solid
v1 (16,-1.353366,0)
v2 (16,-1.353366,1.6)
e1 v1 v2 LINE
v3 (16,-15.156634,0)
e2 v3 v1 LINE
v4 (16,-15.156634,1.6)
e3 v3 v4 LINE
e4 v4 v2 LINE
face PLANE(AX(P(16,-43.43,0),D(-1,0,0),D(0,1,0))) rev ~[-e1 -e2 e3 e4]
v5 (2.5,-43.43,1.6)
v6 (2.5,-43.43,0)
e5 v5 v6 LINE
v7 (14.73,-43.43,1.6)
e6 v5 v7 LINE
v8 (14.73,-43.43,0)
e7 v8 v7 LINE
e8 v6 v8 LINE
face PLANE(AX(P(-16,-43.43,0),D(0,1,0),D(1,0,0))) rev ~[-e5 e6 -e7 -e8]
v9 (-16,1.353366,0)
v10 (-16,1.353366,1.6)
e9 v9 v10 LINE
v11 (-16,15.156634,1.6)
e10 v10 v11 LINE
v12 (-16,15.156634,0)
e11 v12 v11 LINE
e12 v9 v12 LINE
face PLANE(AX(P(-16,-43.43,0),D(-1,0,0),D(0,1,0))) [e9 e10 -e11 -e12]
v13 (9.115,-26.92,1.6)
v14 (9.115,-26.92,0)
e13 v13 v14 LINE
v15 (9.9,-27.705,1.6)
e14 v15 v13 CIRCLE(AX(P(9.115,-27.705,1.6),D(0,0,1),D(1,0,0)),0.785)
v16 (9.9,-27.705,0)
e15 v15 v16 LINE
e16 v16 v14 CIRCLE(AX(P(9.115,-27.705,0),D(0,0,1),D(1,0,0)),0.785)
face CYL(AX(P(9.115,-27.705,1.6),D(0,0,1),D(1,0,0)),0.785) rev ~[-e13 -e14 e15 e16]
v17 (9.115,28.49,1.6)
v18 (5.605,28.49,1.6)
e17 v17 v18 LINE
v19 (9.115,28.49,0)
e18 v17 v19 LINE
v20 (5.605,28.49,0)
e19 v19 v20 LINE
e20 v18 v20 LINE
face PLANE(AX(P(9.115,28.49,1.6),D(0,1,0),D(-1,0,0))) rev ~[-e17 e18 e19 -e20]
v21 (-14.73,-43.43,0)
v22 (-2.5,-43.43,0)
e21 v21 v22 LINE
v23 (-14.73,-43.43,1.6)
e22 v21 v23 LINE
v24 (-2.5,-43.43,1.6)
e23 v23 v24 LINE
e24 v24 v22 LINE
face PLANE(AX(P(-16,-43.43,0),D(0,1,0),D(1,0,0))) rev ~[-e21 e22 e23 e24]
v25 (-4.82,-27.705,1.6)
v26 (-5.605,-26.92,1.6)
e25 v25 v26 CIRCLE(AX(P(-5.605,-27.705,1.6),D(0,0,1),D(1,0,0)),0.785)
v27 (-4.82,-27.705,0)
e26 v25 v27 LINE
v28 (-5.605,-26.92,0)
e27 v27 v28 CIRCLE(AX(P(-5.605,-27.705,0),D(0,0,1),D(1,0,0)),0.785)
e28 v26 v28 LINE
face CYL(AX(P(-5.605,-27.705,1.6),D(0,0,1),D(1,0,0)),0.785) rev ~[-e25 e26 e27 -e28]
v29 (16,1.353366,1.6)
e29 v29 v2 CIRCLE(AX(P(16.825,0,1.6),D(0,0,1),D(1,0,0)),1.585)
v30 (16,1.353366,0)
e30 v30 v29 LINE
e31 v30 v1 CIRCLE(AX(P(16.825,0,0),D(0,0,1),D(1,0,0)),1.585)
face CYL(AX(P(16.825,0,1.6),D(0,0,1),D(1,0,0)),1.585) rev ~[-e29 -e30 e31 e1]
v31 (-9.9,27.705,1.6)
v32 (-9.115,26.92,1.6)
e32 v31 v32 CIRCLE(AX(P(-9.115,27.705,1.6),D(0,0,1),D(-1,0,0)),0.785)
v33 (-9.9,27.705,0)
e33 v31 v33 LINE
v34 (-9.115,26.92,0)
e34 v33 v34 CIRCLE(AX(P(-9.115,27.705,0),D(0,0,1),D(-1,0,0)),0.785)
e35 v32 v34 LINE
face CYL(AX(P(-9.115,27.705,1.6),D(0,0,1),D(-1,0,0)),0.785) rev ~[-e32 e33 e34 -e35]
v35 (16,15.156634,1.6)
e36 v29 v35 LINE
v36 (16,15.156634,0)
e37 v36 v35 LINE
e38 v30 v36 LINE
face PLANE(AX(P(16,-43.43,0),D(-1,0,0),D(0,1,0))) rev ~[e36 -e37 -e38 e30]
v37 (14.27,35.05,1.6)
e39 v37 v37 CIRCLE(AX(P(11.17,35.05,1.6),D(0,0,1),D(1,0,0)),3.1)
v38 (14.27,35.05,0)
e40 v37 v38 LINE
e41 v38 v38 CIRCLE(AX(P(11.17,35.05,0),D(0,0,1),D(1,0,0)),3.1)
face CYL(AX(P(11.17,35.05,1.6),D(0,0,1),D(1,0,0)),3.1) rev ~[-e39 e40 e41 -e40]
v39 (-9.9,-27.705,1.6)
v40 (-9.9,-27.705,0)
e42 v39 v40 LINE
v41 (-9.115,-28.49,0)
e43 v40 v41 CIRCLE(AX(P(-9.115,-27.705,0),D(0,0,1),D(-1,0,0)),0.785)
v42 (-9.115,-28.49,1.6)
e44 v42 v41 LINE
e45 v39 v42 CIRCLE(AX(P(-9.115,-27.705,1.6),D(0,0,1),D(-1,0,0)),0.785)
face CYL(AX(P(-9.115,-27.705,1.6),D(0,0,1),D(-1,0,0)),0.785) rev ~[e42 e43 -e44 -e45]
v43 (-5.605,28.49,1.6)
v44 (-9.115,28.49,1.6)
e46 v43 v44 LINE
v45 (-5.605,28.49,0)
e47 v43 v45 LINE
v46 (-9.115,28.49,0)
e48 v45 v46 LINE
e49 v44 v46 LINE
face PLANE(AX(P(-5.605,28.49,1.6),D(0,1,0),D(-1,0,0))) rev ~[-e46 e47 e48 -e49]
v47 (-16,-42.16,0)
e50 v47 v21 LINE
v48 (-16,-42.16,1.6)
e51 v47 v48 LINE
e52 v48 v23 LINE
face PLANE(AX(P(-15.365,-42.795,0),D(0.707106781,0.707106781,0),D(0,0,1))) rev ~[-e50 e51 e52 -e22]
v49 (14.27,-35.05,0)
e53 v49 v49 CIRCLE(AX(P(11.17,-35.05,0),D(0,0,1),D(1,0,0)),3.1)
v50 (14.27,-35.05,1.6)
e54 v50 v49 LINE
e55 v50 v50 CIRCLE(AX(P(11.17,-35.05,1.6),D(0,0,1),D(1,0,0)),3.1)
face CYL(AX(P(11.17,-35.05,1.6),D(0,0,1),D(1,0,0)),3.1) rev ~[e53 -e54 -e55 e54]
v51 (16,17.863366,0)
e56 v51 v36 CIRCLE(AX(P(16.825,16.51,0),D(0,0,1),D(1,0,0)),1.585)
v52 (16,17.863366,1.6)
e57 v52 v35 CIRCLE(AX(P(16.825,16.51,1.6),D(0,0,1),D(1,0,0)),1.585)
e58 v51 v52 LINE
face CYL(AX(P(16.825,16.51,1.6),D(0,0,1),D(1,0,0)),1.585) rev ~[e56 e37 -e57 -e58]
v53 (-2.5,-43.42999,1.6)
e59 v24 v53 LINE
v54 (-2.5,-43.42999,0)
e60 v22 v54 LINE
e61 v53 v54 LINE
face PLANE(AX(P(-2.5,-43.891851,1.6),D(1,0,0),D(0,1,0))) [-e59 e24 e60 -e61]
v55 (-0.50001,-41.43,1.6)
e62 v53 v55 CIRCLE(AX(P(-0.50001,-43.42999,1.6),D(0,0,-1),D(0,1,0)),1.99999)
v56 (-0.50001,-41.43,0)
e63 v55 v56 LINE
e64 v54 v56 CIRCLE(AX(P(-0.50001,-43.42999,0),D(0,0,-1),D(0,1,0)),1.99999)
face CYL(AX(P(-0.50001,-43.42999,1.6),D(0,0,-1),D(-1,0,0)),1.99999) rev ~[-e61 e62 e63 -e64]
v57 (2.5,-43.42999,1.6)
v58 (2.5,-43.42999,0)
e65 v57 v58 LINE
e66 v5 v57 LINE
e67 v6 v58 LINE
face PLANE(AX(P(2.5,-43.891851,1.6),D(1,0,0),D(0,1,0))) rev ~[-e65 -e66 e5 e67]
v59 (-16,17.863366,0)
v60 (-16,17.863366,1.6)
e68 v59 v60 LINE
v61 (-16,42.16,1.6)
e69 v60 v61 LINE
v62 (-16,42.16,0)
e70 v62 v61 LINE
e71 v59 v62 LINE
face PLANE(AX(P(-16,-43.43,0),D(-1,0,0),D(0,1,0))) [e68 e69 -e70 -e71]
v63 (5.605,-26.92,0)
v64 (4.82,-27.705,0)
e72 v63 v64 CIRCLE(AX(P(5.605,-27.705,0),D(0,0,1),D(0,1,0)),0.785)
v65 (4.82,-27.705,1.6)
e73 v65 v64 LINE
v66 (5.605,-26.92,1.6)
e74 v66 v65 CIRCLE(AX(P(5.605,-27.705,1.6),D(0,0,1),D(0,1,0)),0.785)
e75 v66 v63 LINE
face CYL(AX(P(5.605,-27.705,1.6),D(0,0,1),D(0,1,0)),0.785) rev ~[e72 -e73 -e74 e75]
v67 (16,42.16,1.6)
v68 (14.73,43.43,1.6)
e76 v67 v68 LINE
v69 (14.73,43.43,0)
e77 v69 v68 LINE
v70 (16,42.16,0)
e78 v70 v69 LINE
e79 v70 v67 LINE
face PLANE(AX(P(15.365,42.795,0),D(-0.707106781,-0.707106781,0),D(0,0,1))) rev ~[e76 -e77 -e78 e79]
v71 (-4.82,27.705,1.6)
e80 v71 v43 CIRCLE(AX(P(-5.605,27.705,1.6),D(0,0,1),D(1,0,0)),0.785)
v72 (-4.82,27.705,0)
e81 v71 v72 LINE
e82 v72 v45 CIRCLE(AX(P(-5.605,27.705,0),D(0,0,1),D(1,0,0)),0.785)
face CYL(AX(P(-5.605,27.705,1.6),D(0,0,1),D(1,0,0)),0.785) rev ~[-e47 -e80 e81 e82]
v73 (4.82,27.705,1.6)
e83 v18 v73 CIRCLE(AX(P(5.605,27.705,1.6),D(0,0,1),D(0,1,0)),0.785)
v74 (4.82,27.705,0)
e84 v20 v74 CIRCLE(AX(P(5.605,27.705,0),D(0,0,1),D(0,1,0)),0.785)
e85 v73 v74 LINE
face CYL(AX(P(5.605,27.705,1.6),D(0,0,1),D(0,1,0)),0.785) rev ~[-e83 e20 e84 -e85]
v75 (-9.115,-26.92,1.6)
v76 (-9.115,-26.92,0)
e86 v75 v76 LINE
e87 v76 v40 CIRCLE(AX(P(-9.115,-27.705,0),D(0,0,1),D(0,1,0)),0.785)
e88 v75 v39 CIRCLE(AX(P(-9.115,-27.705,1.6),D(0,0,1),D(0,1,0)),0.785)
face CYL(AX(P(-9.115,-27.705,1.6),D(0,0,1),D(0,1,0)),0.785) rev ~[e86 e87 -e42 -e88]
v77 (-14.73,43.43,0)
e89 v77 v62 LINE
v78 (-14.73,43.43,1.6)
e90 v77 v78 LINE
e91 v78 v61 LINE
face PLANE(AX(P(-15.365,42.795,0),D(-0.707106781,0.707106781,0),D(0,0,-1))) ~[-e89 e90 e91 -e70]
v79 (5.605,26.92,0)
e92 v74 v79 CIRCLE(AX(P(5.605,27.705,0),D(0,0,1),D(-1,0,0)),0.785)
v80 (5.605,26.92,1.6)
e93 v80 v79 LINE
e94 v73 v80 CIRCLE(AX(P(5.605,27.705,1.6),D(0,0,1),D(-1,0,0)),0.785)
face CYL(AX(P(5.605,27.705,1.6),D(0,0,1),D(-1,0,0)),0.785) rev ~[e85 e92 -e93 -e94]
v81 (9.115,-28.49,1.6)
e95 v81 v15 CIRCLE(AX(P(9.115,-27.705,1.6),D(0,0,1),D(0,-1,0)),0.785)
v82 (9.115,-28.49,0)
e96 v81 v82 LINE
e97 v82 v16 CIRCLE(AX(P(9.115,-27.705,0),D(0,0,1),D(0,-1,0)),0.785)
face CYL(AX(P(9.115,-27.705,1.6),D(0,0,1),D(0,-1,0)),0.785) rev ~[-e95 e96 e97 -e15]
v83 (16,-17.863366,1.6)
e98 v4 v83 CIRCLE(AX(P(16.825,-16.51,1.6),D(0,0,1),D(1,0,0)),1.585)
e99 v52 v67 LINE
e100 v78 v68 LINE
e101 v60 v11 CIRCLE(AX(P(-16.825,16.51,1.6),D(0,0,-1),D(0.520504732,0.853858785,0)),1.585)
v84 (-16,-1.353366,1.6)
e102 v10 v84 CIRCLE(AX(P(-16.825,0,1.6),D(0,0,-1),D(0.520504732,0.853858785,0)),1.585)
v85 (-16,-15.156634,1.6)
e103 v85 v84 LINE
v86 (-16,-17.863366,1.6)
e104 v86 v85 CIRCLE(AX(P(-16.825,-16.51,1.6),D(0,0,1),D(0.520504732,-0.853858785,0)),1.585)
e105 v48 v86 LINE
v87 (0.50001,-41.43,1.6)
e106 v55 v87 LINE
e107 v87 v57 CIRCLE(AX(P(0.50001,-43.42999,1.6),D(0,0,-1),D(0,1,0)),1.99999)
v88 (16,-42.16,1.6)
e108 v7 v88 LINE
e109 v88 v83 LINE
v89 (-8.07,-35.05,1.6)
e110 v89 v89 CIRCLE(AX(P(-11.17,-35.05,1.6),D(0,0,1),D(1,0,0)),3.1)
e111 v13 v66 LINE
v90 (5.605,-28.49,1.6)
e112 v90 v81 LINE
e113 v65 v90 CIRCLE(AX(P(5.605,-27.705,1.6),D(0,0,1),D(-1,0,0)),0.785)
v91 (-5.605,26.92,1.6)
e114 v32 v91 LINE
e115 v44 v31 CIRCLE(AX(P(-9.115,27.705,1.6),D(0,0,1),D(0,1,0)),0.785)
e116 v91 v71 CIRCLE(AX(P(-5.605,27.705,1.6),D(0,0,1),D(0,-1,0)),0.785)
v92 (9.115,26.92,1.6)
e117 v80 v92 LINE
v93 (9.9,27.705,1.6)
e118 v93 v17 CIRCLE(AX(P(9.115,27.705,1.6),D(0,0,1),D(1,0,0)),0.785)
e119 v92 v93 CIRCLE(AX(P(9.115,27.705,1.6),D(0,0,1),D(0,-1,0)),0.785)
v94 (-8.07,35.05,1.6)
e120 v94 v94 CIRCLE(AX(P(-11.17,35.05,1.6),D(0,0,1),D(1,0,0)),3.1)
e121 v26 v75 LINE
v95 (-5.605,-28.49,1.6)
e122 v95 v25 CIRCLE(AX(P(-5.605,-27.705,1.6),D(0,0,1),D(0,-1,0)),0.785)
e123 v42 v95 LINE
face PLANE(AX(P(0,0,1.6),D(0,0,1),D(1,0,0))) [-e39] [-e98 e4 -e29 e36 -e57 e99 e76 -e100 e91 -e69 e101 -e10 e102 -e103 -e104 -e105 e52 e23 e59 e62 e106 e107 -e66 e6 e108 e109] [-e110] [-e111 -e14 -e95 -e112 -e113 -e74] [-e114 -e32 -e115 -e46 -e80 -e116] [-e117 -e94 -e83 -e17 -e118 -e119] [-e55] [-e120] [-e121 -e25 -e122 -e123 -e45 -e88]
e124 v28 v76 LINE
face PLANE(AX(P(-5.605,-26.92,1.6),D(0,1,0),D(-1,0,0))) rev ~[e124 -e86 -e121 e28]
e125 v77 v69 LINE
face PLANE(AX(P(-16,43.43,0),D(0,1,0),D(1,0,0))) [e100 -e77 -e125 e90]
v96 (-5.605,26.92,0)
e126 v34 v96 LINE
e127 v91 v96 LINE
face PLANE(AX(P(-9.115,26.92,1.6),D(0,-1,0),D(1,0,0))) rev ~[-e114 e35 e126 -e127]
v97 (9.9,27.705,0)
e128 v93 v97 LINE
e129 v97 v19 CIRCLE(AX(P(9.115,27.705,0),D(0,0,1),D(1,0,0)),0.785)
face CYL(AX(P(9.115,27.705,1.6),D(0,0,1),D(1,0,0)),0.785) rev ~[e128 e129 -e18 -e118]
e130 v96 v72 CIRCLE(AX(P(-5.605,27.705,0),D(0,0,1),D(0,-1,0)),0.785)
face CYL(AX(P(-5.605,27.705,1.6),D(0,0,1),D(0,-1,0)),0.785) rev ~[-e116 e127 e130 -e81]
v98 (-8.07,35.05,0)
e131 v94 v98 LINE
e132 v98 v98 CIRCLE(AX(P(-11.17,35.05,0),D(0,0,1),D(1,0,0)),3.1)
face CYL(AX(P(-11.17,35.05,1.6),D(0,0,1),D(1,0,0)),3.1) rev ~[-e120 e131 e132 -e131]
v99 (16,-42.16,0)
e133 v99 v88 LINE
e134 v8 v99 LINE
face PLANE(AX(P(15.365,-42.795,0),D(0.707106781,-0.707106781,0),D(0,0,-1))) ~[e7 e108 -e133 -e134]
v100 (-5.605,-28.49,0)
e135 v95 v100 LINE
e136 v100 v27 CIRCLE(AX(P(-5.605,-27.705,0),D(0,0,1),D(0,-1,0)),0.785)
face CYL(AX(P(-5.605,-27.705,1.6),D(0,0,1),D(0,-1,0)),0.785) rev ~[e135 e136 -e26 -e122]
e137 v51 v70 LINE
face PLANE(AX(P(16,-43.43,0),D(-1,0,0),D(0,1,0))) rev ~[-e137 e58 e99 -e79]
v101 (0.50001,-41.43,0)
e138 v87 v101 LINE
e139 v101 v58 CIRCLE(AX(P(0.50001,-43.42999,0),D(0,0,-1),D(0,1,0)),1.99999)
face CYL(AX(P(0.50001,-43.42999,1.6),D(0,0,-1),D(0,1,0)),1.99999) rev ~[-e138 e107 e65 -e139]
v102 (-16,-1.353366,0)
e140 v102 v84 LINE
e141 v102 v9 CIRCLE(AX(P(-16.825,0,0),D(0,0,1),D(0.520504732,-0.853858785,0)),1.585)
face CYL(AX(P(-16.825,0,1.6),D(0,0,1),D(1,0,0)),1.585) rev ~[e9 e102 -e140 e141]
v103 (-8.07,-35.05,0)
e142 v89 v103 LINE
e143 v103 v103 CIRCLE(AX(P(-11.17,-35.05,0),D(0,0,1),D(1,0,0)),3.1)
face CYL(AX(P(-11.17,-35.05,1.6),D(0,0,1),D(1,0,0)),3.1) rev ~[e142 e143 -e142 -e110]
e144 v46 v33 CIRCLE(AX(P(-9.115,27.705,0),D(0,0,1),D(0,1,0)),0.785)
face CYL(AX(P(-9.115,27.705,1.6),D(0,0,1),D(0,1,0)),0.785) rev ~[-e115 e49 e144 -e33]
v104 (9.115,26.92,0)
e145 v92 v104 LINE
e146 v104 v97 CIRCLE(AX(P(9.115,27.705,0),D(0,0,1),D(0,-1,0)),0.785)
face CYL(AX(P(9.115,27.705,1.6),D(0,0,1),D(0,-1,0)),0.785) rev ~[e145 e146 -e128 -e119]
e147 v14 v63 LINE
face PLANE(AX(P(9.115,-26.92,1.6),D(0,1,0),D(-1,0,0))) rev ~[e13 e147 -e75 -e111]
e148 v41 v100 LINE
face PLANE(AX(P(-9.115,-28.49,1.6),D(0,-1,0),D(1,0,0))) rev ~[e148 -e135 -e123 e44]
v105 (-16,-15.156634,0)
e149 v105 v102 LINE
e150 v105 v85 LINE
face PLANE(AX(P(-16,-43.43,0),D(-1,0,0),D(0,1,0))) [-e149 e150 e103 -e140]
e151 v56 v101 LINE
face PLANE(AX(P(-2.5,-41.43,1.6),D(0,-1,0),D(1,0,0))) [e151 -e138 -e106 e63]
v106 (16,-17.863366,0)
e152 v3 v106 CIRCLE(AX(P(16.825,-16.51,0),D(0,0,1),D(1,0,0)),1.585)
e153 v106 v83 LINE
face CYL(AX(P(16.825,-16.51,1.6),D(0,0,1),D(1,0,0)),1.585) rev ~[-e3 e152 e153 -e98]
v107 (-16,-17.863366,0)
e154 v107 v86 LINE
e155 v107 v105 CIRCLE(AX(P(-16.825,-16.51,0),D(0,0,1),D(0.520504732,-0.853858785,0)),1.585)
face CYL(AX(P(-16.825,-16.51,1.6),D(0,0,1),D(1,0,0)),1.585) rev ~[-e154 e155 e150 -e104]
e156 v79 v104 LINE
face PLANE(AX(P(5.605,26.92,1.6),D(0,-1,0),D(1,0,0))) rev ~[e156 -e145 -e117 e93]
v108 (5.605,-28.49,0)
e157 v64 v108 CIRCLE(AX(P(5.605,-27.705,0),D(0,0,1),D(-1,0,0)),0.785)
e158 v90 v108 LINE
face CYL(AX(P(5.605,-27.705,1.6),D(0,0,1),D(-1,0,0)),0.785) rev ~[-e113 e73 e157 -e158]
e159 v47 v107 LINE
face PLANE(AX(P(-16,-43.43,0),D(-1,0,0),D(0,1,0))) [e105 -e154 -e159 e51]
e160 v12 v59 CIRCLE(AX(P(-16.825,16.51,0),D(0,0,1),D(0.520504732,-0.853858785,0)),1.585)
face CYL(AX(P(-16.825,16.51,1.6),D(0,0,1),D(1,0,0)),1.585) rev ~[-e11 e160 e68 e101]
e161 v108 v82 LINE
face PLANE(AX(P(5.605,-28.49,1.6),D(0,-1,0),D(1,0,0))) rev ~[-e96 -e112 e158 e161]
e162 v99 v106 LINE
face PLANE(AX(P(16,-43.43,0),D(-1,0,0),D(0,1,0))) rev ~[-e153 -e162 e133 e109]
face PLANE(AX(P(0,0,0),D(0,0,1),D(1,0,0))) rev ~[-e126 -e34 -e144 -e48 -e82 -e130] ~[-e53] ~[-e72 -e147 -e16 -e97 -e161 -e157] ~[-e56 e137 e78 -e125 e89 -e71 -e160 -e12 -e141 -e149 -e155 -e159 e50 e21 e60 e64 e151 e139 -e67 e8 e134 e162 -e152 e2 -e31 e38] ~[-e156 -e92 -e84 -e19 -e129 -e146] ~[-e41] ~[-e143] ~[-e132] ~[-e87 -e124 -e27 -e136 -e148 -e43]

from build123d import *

# Parameters (mm, degrees)
F0_W     = 32
F0_H     = 86.86
F1_DEPTH = 1.6
F2_R     = 3.1
F2_R_2   = 1.585
F2_W     = 5
F2_H     = 2.4618506432
F3_DEPTH = 25
F4_SIZE  = 1.27
F5_R     = 1.99999


# Not quite as in the source:
# - a fillet or chamfer is up to 0.001 mm smaller than in the source, because OpenCascade refuses the exact size


with BuildPart() as f1:
    # F0 (on Top) → F1 (new body)
    with BuildSketch(Plane.XY):
        Rectangle(F0_W, F0_H)
    extrude(amount=F1_DEPTH)

    # F2 (on face) → F3 (cut)
    with BuildSketch(Plane.XY.offset(1.6)):
        with Locations((-11.17, 35.05)):
            Circle(F2_R)
        with Locations((11.17, 35.05)):
            Circle(F2_R)
        with Locations((-11.17, -35.05)):
            Circle(F2_R)
        with Locations((11.17, -35.05)):
            Circle(F2_R)
        with BuildLine():
            Line((9.115, 28.49), (5.605, 28.49))
            ThreePointArc((5.605, 28.49), (5.0499211768, 28.2600788232), (4.82, 27.705))
            ThreePointArc((4.82, 27.705), (5.0499211768, 27.1499211768), (5.605, 26.92))
            Line((5.605, 26.92), (9.115, 26.92))
            ThreePointArc((9.115, 26.92), (9.6700788232, 27.1499211768), (9.9, 27.705))
            ThreePointArc((9.9, 27.705), (9.6700788232, 28.2600788232), (9.115, 28.49))
        make_face()
        with BuildLine():
            Line((-5.605, 28.49), (-9.115, 28.49))
            ThreePointArc((-9.115, 28.49), (-9.6700788232, 28.2600788232), (-9.9, 27.705))
            ThreePointArc((-9.9, 27.705), (-9.6700788232, 27.1499211768), (-9.115, 26.92))
            Line((-9.115, 26.92), (-5.605, 26.92))
            ThreePointArc((-5.605, 26.92), (-5.0499211768, 27.1499211768), (-4.82, 27.705))
            ThreePointArc((-4.82, 27.705), (-5.0499211768, 28.2600788232), (-5.605, 28.49))
        make_face()
        with Locations((16.825, 16.51)):
            Circle(F2_R_2)
        with Locations((16.825, 0)):
            Circle(F2_R_2)
        with Locations((16.825, -16.51)):
            Circle(F2_R_2)
        with Locations((-16.825, 0)):
            Circle(F2_R_2)
        with Locations((-16.825, 16.51)):
            Circle(F2_R_2)
        with Locations((-16.825, -16.51)):
            Circle(F2_R_2)
        with BuildLine():
            Line((-5.605, -26.92), (-9.115, -26.92))
            ThreePointArc((-9.115, -26.92), (-9.6700788232, -27.1499211768), (-9.9, -27.705))
            ThreePointArc((-9.9, -27.705), (-9.6700788232, -28.2600788232), (-9.115, -28.49))
            Line((-9.115, -28.49), (-5.605, -28.49))
            ThreePointArc((-5.605, -28.49), (-5.0499211768, -28.2600788232), (-4.82, -27.705))
            ThreePointArc((-4.82, -27.705), (-5.0499211768, -27.1499211768), (-5.605, -26.92))
        make_face()
        with BuildLine():
            Line((9.115, -26.92), (5.605, -26.92))
            ThreePointArc((5.605, -26.92), (5.0499211768, -27.1499211768), (4.82, -27.705))
            ThreePointArc((4.82, -27.705), (5.0499211768, -28.2600788232), (5.605, -28.49))
            Line((5.605, -28.49), (9.115, -28.49))
            ThreePointArc((9.115, -28.49), (9.6700788232, -28.2600788232), (9.9, -27.705))
            ThreePointArc((9.9, -27.705), (9.6700788232, -27.1499211768), (9.115, -26.92))
        make_face()
        with Locations((0, -42.6609253216)):
            Rectangle(F2_W, F2_H)
    extrude(amount=-F3_DEPTH, mode=Mode.SUBTRACT)

    # F4
    f4_edges = [f1.edges().sort_by_distance(p)[0] for p in [
        (16, 43.43, 0.8),
        (-16, 43.43, 0.8),
        (16, -43.43, 0.8),
        (-16, -43.43, 0.8),
    ]]
    chamfer(f4_edges, length=F4_SIZE)

    # F5 (radius 2 in the source; OpenCascade refuses exactly that, so slightly less here)
    f5_edges = [f1.edges().sort_by_distance(p)[0] for p in [
        (-2.5, -41.43, 0.8),
        (2.5, -41.43, 0.8),
    ]]
    fillet(f5_edges, radius=F5_R)


solid = f1.part
